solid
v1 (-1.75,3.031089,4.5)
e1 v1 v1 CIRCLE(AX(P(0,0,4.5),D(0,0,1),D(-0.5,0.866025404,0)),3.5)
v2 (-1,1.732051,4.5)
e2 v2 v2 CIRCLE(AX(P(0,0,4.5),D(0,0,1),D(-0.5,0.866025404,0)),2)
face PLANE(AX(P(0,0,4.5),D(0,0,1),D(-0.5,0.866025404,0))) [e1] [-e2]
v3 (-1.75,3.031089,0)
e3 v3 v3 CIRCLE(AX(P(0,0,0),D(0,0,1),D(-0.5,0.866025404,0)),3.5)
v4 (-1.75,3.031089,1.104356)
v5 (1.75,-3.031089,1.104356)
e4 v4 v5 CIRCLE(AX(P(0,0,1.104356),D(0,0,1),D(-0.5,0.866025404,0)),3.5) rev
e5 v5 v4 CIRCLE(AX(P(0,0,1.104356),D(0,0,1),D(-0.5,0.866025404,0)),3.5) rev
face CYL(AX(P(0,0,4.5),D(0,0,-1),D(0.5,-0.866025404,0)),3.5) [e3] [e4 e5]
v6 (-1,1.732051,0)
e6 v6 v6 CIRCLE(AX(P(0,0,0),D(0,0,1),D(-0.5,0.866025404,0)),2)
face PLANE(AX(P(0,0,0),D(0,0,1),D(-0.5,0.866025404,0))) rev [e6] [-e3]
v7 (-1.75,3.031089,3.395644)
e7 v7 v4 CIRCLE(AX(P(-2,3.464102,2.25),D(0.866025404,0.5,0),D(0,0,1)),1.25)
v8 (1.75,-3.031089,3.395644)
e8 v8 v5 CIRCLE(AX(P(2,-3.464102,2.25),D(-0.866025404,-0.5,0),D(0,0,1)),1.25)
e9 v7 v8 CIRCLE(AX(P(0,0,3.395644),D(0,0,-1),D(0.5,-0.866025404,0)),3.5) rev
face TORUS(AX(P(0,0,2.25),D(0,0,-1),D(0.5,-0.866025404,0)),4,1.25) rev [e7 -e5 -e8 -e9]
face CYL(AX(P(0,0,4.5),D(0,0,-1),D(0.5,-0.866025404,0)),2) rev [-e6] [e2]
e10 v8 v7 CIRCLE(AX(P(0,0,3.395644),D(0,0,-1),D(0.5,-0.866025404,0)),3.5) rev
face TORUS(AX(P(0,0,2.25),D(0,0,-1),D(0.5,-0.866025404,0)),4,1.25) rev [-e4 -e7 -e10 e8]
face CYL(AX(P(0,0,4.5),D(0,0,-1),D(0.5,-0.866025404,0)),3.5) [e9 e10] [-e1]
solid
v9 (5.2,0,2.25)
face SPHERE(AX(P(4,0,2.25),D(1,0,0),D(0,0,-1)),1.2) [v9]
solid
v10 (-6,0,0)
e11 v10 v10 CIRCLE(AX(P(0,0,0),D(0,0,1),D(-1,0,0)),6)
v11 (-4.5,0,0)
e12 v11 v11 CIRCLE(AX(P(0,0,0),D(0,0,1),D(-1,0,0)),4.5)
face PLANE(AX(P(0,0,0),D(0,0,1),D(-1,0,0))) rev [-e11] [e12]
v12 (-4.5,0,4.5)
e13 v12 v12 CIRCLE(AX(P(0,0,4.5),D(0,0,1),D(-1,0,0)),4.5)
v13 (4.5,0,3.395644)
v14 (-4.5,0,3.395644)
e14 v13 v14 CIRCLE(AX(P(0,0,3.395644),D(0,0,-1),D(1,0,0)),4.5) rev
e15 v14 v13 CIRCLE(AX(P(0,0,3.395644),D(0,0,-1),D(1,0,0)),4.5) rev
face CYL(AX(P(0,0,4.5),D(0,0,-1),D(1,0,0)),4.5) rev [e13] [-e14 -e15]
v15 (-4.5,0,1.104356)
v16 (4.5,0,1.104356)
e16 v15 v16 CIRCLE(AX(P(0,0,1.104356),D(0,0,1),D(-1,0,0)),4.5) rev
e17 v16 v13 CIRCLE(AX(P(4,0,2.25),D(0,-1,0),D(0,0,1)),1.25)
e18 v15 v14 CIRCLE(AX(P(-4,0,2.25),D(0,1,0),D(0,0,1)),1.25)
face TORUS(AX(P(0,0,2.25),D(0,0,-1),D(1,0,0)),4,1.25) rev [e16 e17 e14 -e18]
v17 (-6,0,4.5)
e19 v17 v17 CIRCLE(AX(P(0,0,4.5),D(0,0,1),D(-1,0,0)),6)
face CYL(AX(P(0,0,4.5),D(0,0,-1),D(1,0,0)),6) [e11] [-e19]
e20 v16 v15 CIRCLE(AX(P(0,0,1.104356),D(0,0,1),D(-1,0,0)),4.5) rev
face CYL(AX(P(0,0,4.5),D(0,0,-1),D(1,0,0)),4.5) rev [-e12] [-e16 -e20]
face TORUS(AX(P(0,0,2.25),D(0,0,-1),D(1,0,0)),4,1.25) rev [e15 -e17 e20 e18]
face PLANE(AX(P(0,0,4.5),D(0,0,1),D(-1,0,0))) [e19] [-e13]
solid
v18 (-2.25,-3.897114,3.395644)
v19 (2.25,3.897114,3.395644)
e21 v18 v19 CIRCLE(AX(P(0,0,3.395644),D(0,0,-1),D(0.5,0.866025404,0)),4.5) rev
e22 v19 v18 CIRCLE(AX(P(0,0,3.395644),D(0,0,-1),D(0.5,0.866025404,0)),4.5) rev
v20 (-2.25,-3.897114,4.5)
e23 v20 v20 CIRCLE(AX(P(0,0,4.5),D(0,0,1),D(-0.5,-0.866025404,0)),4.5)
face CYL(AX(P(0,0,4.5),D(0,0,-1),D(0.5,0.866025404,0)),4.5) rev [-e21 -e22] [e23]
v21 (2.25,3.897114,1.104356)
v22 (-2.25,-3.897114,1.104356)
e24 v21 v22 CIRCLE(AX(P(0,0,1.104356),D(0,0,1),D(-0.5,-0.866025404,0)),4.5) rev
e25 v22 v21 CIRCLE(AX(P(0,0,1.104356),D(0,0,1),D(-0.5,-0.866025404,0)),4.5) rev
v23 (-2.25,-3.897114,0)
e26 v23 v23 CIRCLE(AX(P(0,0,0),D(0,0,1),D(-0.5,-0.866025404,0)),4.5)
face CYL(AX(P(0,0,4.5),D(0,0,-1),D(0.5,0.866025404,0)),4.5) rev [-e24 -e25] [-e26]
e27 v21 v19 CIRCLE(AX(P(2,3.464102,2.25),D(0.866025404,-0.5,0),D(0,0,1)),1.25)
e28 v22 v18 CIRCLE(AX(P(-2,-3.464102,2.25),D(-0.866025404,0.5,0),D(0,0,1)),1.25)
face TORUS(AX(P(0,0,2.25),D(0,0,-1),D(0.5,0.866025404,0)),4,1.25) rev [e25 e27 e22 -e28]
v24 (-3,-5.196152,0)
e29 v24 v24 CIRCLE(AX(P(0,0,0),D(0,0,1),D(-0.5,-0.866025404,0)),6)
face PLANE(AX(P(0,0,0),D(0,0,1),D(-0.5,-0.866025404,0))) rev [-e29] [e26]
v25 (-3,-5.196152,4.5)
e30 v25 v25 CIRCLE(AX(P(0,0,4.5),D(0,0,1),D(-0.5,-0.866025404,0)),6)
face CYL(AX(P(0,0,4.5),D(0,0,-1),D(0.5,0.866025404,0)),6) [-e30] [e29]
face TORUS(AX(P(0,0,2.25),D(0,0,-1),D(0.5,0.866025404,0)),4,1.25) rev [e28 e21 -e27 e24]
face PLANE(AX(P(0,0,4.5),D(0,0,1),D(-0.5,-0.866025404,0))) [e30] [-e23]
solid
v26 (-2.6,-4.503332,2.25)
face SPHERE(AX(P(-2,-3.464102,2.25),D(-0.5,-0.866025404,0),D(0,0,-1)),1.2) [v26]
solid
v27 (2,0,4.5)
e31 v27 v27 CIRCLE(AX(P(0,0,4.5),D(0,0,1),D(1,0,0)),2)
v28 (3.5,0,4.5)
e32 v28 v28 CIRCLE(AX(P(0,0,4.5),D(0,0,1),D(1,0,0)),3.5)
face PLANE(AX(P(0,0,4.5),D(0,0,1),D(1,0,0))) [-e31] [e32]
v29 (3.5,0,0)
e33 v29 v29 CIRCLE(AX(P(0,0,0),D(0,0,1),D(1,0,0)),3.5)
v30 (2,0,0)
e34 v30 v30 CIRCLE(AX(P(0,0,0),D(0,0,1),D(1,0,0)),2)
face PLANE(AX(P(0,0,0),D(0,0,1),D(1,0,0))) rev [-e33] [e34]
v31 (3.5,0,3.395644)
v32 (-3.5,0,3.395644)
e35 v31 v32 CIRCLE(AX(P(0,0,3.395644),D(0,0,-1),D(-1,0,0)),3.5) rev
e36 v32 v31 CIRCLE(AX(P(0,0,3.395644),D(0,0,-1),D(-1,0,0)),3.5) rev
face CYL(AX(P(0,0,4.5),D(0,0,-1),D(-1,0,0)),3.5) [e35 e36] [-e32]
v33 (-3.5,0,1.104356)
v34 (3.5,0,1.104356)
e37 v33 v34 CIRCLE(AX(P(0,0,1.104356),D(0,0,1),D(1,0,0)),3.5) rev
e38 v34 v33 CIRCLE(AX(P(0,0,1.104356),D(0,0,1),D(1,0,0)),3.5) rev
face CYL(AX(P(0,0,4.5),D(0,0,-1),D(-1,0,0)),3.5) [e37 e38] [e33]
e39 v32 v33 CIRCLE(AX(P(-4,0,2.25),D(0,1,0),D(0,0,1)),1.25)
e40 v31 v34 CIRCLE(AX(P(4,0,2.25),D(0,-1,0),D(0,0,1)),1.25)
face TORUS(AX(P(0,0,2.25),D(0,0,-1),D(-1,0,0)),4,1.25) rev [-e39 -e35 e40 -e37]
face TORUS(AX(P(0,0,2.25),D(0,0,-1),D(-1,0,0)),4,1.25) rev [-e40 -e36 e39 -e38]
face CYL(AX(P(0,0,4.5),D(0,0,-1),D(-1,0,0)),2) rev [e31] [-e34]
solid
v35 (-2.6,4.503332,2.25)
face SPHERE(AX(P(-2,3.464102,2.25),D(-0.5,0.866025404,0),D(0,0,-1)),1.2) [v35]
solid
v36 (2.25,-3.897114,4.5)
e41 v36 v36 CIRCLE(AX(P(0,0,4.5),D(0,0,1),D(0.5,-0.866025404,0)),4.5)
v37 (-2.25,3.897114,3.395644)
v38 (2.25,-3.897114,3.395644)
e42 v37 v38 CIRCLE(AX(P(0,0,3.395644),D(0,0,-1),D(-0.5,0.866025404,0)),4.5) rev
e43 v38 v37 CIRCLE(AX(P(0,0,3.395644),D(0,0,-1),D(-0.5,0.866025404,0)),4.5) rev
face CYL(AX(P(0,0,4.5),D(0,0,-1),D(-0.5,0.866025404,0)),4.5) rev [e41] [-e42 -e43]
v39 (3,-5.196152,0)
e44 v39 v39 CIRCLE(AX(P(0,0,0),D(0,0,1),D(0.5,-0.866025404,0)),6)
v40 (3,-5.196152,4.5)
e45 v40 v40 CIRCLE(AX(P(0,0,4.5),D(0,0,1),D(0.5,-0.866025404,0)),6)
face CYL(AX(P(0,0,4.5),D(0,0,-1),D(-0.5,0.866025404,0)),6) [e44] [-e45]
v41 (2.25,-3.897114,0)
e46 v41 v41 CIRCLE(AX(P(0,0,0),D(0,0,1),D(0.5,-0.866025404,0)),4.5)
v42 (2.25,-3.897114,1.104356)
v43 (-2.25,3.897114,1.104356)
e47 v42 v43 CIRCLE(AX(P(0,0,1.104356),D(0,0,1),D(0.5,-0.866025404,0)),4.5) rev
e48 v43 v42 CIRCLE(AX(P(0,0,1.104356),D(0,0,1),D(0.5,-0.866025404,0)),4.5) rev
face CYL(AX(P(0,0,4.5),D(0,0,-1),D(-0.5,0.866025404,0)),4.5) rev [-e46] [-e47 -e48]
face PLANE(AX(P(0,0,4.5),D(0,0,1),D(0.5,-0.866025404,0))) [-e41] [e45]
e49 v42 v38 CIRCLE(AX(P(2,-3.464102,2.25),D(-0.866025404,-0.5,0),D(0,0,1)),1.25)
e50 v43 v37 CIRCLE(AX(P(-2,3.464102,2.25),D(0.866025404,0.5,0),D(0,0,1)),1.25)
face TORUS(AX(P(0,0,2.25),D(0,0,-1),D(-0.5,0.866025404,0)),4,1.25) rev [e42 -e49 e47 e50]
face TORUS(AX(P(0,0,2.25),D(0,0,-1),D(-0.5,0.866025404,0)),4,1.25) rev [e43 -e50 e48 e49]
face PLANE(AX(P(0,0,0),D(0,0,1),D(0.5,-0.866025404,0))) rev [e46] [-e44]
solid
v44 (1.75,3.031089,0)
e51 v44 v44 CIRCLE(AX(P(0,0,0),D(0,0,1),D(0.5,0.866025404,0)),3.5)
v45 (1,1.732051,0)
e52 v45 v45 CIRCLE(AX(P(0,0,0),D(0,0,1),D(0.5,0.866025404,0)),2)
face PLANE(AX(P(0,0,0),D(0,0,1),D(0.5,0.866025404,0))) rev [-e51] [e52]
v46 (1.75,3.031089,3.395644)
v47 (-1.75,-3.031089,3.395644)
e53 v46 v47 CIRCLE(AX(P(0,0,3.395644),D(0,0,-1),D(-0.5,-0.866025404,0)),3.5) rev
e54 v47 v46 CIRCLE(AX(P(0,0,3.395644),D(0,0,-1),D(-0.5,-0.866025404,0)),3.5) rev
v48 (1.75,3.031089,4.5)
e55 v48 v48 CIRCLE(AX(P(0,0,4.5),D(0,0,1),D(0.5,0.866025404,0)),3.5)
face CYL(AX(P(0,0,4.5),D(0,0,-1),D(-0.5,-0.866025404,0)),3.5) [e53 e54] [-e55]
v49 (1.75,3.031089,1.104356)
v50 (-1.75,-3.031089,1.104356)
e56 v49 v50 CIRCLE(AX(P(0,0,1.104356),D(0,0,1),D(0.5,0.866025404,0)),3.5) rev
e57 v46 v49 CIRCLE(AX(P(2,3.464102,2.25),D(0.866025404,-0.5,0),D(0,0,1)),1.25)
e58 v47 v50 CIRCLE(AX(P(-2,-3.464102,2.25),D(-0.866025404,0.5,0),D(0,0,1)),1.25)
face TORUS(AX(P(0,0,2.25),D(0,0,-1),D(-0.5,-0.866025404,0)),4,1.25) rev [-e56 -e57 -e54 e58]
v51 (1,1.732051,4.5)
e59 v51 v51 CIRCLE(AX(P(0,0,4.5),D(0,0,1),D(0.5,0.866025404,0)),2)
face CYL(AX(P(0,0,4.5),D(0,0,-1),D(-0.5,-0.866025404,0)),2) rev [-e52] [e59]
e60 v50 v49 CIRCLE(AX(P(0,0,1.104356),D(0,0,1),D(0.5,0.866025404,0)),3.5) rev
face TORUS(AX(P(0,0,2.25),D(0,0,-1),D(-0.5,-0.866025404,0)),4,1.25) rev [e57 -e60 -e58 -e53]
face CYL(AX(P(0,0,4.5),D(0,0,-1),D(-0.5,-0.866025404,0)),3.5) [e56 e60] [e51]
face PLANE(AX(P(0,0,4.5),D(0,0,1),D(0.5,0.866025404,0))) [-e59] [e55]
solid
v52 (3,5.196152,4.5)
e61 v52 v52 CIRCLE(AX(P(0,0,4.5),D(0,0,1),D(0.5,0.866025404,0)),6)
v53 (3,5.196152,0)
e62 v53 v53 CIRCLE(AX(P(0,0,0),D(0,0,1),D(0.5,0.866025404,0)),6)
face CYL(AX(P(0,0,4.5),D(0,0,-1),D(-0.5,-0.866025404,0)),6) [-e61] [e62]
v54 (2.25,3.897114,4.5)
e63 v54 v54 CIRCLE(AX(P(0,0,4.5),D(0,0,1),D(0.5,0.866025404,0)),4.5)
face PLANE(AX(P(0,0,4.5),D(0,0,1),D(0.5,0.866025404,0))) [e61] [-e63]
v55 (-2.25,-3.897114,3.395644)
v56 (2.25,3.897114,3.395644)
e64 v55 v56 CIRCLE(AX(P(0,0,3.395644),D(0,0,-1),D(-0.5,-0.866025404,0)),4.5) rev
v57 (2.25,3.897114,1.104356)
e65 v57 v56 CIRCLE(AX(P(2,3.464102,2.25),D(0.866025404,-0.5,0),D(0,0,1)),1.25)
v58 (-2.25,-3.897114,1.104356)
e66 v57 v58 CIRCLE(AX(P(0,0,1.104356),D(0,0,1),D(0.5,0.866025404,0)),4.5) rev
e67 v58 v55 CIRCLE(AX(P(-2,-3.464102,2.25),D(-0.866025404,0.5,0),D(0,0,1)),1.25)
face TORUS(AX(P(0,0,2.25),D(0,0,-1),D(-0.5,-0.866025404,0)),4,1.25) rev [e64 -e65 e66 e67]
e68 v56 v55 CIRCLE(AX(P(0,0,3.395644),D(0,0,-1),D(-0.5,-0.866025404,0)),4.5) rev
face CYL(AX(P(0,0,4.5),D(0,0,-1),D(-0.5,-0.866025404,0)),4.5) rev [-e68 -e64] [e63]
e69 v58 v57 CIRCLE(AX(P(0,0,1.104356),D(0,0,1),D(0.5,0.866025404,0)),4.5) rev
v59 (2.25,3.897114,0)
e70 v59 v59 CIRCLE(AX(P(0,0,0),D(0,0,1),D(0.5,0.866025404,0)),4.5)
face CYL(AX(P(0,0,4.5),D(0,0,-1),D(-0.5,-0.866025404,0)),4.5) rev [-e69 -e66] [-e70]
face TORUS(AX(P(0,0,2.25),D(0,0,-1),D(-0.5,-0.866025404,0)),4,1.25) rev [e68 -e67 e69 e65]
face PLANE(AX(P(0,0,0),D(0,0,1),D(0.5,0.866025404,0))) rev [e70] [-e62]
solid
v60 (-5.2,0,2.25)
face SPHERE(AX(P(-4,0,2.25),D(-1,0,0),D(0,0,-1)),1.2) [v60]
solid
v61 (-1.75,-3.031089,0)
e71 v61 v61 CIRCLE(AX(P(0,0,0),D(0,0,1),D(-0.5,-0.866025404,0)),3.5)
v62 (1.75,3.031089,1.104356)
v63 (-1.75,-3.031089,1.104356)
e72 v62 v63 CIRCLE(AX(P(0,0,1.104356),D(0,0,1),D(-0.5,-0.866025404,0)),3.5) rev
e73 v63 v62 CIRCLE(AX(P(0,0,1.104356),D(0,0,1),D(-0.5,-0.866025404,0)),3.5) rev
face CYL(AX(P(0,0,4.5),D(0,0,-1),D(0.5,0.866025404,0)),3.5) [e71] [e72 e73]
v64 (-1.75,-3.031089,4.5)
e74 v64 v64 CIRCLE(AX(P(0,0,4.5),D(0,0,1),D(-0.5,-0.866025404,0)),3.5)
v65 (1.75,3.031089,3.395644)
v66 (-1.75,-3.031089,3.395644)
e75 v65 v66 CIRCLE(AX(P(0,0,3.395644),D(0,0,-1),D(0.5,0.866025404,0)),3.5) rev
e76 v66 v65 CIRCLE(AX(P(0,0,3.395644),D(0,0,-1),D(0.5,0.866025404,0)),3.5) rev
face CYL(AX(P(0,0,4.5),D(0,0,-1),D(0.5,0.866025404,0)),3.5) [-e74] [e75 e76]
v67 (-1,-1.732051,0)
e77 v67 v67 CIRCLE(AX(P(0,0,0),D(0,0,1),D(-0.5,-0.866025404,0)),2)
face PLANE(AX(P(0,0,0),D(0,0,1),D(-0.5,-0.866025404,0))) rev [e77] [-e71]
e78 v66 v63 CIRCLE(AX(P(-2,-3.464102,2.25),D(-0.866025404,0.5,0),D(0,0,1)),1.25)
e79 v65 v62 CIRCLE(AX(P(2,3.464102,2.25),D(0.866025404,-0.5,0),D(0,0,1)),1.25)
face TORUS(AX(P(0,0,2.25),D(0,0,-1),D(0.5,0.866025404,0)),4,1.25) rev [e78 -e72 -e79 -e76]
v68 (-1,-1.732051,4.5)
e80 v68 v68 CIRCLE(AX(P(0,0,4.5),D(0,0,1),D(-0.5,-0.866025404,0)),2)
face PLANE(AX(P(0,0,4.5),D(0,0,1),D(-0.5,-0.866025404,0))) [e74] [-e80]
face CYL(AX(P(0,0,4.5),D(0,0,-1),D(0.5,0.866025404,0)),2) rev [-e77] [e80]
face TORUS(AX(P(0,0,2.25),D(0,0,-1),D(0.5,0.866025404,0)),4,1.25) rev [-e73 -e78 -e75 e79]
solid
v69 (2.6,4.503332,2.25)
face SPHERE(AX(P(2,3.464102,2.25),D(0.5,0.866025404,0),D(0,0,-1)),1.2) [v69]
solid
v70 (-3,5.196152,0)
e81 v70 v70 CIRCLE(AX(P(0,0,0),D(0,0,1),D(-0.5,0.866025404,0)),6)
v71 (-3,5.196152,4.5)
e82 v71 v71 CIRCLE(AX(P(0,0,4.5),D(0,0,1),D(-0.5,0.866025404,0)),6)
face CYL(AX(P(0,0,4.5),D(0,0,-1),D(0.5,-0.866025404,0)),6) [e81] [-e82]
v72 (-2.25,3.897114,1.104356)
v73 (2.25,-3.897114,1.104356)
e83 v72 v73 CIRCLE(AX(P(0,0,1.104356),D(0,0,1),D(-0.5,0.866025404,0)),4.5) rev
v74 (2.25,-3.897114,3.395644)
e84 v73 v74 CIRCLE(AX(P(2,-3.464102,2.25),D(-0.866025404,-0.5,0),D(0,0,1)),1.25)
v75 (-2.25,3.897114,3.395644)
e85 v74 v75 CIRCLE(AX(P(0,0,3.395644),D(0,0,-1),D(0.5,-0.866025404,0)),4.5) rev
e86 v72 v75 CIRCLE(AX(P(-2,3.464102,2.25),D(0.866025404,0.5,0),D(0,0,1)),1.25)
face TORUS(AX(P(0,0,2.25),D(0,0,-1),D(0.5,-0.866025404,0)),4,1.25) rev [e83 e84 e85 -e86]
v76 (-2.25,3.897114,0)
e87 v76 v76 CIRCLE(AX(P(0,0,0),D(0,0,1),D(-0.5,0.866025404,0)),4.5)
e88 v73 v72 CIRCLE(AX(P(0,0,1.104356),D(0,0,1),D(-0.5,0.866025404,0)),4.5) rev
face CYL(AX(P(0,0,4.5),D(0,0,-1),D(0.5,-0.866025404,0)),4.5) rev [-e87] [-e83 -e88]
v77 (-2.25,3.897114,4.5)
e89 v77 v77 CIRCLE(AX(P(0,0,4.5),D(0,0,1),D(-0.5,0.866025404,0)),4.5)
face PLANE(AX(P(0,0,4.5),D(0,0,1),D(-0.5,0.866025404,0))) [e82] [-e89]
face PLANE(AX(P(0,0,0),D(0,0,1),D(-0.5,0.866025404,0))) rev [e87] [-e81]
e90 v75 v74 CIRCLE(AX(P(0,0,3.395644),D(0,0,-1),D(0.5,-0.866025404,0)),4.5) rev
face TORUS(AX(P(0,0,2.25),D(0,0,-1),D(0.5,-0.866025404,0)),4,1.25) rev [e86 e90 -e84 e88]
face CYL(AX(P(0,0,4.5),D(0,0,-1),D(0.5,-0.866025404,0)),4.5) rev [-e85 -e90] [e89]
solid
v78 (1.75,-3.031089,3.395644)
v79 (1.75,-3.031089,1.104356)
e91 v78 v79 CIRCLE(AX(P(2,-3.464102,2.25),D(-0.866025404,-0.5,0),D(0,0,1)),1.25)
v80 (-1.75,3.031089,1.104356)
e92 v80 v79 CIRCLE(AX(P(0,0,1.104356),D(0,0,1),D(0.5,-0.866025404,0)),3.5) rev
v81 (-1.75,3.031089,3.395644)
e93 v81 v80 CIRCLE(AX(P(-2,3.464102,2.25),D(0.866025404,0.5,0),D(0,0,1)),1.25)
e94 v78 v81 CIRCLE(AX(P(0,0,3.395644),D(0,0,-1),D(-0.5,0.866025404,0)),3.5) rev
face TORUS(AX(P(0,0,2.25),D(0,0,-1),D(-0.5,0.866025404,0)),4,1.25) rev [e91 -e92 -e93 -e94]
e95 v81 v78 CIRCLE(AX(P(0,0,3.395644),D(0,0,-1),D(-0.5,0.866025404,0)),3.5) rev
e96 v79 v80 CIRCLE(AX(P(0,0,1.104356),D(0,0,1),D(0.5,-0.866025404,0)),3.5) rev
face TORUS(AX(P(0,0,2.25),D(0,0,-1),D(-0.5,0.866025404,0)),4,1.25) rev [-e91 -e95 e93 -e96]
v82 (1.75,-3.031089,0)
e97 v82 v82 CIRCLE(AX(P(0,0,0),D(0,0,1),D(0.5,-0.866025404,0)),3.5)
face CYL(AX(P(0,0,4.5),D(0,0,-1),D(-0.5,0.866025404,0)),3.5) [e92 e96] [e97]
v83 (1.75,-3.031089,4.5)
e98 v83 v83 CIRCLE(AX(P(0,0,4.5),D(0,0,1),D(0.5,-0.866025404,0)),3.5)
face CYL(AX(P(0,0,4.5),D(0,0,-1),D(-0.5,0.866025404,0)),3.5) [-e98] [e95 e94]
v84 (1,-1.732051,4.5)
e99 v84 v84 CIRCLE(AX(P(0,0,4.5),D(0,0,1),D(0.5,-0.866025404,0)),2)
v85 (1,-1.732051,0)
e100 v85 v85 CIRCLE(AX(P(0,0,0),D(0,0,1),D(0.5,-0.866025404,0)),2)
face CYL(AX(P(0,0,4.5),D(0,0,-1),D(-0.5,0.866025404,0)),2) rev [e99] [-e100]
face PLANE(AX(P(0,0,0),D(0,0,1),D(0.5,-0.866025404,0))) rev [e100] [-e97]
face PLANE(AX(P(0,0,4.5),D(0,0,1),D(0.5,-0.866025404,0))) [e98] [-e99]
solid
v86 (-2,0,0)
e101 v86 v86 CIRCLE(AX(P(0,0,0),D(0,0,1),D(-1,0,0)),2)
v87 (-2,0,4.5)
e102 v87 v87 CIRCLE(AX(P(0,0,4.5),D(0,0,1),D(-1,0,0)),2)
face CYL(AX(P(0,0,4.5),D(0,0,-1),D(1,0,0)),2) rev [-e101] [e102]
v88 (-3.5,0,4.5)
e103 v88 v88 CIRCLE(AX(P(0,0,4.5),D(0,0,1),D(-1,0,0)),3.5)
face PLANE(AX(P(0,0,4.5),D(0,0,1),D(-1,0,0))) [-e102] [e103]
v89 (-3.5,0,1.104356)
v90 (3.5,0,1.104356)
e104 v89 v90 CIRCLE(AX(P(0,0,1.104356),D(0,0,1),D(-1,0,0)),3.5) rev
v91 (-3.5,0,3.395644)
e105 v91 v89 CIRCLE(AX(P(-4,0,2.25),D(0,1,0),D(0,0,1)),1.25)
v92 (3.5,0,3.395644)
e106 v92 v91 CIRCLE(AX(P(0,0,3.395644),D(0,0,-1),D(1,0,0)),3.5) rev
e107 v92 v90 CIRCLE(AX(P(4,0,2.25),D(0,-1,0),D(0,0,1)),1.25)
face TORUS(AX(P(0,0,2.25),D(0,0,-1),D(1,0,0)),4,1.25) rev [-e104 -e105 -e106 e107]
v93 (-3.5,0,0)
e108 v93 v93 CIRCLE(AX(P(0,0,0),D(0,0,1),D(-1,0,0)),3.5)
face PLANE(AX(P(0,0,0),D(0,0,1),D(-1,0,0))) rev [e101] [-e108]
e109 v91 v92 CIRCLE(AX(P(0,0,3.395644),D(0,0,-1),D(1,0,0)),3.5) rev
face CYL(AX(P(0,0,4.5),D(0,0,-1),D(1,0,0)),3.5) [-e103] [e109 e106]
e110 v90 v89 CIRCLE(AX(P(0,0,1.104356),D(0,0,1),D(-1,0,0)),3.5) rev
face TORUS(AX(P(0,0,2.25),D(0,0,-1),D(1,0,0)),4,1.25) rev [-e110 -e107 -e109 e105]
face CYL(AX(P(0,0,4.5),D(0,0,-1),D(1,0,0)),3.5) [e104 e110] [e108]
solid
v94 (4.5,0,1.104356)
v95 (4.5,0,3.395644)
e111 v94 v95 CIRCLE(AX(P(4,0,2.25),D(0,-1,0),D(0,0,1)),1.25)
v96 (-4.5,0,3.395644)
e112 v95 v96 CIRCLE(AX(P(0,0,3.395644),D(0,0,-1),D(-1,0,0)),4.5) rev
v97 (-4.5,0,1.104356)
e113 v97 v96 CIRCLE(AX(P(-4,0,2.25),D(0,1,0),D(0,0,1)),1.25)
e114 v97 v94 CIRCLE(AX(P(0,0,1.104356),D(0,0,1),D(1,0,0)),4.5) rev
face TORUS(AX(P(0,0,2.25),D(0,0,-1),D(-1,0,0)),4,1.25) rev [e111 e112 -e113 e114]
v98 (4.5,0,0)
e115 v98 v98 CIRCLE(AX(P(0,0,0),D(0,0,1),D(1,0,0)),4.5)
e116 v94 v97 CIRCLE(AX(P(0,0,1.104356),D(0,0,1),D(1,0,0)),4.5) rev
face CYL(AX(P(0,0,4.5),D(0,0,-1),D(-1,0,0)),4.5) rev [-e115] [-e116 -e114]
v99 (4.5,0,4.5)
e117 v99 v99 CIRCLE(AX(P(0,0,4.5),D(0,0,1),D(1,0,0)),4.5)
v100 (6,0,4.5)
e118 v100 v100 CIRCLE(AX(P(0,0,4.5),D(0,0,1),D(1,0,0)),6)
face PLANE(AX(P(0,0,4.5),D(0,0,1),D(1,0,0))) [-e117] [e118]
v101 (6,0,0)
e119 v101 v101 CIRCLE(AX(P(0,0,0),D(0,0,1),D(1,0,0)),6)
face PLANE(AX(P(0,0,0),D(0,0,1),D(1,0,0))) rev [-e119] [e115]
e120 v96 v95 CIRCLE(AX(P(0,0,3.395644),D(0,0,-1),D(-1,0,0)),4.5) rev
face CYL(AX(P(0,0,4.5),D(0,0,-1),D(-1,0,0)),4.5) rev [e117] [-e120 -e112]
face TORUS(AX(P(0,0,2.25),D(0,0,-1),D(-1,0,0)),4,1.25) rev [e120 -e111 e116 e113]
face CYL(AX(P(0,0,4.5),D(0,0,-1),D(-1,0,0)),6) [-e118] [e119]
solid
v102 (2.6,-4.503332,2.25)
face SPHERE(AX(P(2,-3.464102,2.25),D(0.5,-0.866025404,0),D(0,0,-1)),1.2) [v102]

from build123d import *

# Parameters (mm, degrees)
SKETCH1_R           = 6
SKETCH1_R_2         = 4.5
BOSS_EXTRUDE1_DEPTH = 4.5
SKETCH4_R           = 3.5
SKETCH4_R_2         = 2
BOSS_EXTRUDE3_DEPTH = 4.5
CIRPATTERN9_COUNT   = 6


# Read off the part's stored shape, not the designer's step: Cut-Sweep1
with BuildPart() as part:
    # Sketch1 → Boss-Extrude1 (new body)
    with BuildSketch(Plane.XY):
        Circle(SKETCH1_R)
        Circle(SKETCH1_R_2, mode=Mode.SUBTRACT)
    extrude(amount=BOSS_EXTRUDE1_DEPTH)


with BuildPart() as body_2:
    # Sketch4 → Boss-Extrude3 (new body)
    with BuildSketch(Plane.XY):
        Circle(SKETCH4_R)
        Circle(SKETCH4_R_2, mode=Mode.SUBTRACT)
    extrude(amount=BOSS_EXTRUDE3_DEPTH)


with BuildPart() as cut_sweep1_tool:
    # Cut-Sweep1 outline → Cut-Sweep1 (revolve)
    with BuildSketch(Plane.XZ):
        with BuildLine():
            ThreePointArc((3.5, 3.395643924), (2.75, 2.25), (3.5, 1.104356076))
            Line((3.5, 1.104356076), (4.5, 1.104356076))
            ThreePointArc((4.5, 1.104356076), (5.25, 2.25), (4.5, 3.395643924))
            Line((4.5, 3.395643924), (3.5, 3.395643924))
        make_face()
    revolve(axis=Axis((0, 0, 0), (0, 0, 1)))


with BuildPart() as part_1:
    add(part.part)

    # Cut-Sweep1: cut by cut_sweep1_tool
    add(cut_sweep1_tool.part, mode=Mode.SUBTRACT)


with BuildPart() as body_2_1:
    add(body_2.part)

    # Cut-Sweep1: cut by cut_sweep1_tool
    add(cut_sweep1_tool.part, mode=Mode.SUBTRACT)


with BuildPart() as body_3:
    # Sketch6 → Revolve2 (revolve)
    with BuildSketch(Plane(origin=(0, 0, 0), x_dir=(1, 0, 0), z_dir=(0, 1, 0))):
        with BuildLine():
            Line((-5.2, -2.25), (-2.8, -2.25))
            ThreePointArc((-2.8, -2.25), (-4, -1.05), (-5.2, -2.25))
        make_face()
    revolve(axis=Axis((-5.2, 0, 2.25), (1, 0, 0)))


with BuildPart() as cirpattern9_1:
    # CirPattern9: pattern copy
    add(part_1.part.rotate(Axis((0, 0, 0), (0, 0, 1)), 1 * 360 / CIRPATTERN9_COUNT))


with BuildPart() as cirpattern9_2:
    # CirPattern9: pattern copy
    add(part_1.part.rotate(Axis((0, 0, 0), (0, 0, 1)), 2 * 360 / CIRPATTERN9_COUNT))


with BuildPart() as cirpattern9_3:
    # CirPattern9: pattern copy
    add(part_1.part.rotate(Axis((0, 0, 0), (0, 0, 1)), 3 * 360 / CIRPATTERN9_COUNT))


with BuildPart() as cirpattern9_4:
    # CirPattern9: pattern copy
    add(part_1.part.rotate(Axis((0, 0, 0), (0, 0, 1)), 4 * 360 / CIRPATTERN9_COUNT))


with BuildPart() as cirpattern9_5:
    # CirPattern9: pattern copy
    add(part_1.part.rotate(Axis((0, 0, 0), (0, 0, 1)), 5 * 360 / CIRPATTERN9_COUNT))


with BuildPart() as cirpattern9_6:
    # CirPattern9: pattern copy
    add(body_2_1.part.rotate(Axis((0, 0, 0), (0, 0, 1)), 1 * 360 / CIRPATTERN9_COUNT))


with BuildPart() as cirpattern9_7:
    # CirPattern9: pattern copy
    add(body_2_1.part.rotate(Axis((0, 0, 0), (0, 0, 1)), 2 * 360 / CIRPATTERN9_COUNT))


with BuildPart() as cirpattern9_8:
    # CirPattern9: pattern copy
    add(body_2_1.part.rotate(Axis((0, 0, 0), (0, 0, 1)), 3 * 360 / CIRPATTERN9_COUNT))


with BuildPart() as cirpattern9_9:
    # CirPattern9: pattern copy
    add(body_2_1.part.rotate(Axis((0, 0, 0), (0, 0, 1)), 4 * 360 / CIRPATTERN9_COUNT))


with BuildPart() as cirpattern9_10:
    # CirPattern9: pattern copy
    add(body_2_1.part.rotate(Axis((0, 0, 0), (0, 0, 1)), 5 * 360 / CIRPATTERN9_COUNT))


with BuildPart() as cirpattern9_11:
    # CirPattern9: pattern copy
    add(body_3.part.rotate(Axis((0, 0, 0), (0, 0, 1)), 1 * 360 / CIRPATTERN9_COUNT))


with BuildPart() as cirpattern9_12:
    # CirPattern9: pattern copy
    add(body_3.part.rotate(Axis((0, 0, 0), (0, 0, 1)), 2 * 360 / CIRPATTERN9_COUNT))


with BuildPart() as cirpattern9_13:
    # CirPattern9: pattern copy
    add(body_3.part.rotate(Axis((0, 0, 0), (0, 0, 1)), 3 * 360 / CIRPATTERN9_COUNT))


with BuildPart() as cirpattern9_14:
    # CirPattern9: pattern copy
    add(body_3.part.rotate(Axis((0, 0, 0), (0, 0, 1)), 4 * 360 / CIRPATTERN9_COUNT))


with BuildPart() as cirpattern9_15:
    # CirPattern9: pattern copy
    add(body_3.part.rotate(Axis((0, 0, 0), (0, 0, 1)), 5 * 360 / CIRPATTERN9_COUNT))


solid = Compound([part_1.part, body_2_1.part, body_3.part, cirpattern9_1.part, cirpattern9_2.part, cirpattern9_3.part, cirpattern9_4.part, cirpattern9_5.part, cirpattern9_6.part, cirpattern9_7.part, cirpattern9_8.part, cirpattern9_9.part, cirpattern9_10.part, cirpattern9_11.part, cirpattern9_12.part, cirpattern9_13.part, cirpattern9_14.part, cirpattern9_15.part])
